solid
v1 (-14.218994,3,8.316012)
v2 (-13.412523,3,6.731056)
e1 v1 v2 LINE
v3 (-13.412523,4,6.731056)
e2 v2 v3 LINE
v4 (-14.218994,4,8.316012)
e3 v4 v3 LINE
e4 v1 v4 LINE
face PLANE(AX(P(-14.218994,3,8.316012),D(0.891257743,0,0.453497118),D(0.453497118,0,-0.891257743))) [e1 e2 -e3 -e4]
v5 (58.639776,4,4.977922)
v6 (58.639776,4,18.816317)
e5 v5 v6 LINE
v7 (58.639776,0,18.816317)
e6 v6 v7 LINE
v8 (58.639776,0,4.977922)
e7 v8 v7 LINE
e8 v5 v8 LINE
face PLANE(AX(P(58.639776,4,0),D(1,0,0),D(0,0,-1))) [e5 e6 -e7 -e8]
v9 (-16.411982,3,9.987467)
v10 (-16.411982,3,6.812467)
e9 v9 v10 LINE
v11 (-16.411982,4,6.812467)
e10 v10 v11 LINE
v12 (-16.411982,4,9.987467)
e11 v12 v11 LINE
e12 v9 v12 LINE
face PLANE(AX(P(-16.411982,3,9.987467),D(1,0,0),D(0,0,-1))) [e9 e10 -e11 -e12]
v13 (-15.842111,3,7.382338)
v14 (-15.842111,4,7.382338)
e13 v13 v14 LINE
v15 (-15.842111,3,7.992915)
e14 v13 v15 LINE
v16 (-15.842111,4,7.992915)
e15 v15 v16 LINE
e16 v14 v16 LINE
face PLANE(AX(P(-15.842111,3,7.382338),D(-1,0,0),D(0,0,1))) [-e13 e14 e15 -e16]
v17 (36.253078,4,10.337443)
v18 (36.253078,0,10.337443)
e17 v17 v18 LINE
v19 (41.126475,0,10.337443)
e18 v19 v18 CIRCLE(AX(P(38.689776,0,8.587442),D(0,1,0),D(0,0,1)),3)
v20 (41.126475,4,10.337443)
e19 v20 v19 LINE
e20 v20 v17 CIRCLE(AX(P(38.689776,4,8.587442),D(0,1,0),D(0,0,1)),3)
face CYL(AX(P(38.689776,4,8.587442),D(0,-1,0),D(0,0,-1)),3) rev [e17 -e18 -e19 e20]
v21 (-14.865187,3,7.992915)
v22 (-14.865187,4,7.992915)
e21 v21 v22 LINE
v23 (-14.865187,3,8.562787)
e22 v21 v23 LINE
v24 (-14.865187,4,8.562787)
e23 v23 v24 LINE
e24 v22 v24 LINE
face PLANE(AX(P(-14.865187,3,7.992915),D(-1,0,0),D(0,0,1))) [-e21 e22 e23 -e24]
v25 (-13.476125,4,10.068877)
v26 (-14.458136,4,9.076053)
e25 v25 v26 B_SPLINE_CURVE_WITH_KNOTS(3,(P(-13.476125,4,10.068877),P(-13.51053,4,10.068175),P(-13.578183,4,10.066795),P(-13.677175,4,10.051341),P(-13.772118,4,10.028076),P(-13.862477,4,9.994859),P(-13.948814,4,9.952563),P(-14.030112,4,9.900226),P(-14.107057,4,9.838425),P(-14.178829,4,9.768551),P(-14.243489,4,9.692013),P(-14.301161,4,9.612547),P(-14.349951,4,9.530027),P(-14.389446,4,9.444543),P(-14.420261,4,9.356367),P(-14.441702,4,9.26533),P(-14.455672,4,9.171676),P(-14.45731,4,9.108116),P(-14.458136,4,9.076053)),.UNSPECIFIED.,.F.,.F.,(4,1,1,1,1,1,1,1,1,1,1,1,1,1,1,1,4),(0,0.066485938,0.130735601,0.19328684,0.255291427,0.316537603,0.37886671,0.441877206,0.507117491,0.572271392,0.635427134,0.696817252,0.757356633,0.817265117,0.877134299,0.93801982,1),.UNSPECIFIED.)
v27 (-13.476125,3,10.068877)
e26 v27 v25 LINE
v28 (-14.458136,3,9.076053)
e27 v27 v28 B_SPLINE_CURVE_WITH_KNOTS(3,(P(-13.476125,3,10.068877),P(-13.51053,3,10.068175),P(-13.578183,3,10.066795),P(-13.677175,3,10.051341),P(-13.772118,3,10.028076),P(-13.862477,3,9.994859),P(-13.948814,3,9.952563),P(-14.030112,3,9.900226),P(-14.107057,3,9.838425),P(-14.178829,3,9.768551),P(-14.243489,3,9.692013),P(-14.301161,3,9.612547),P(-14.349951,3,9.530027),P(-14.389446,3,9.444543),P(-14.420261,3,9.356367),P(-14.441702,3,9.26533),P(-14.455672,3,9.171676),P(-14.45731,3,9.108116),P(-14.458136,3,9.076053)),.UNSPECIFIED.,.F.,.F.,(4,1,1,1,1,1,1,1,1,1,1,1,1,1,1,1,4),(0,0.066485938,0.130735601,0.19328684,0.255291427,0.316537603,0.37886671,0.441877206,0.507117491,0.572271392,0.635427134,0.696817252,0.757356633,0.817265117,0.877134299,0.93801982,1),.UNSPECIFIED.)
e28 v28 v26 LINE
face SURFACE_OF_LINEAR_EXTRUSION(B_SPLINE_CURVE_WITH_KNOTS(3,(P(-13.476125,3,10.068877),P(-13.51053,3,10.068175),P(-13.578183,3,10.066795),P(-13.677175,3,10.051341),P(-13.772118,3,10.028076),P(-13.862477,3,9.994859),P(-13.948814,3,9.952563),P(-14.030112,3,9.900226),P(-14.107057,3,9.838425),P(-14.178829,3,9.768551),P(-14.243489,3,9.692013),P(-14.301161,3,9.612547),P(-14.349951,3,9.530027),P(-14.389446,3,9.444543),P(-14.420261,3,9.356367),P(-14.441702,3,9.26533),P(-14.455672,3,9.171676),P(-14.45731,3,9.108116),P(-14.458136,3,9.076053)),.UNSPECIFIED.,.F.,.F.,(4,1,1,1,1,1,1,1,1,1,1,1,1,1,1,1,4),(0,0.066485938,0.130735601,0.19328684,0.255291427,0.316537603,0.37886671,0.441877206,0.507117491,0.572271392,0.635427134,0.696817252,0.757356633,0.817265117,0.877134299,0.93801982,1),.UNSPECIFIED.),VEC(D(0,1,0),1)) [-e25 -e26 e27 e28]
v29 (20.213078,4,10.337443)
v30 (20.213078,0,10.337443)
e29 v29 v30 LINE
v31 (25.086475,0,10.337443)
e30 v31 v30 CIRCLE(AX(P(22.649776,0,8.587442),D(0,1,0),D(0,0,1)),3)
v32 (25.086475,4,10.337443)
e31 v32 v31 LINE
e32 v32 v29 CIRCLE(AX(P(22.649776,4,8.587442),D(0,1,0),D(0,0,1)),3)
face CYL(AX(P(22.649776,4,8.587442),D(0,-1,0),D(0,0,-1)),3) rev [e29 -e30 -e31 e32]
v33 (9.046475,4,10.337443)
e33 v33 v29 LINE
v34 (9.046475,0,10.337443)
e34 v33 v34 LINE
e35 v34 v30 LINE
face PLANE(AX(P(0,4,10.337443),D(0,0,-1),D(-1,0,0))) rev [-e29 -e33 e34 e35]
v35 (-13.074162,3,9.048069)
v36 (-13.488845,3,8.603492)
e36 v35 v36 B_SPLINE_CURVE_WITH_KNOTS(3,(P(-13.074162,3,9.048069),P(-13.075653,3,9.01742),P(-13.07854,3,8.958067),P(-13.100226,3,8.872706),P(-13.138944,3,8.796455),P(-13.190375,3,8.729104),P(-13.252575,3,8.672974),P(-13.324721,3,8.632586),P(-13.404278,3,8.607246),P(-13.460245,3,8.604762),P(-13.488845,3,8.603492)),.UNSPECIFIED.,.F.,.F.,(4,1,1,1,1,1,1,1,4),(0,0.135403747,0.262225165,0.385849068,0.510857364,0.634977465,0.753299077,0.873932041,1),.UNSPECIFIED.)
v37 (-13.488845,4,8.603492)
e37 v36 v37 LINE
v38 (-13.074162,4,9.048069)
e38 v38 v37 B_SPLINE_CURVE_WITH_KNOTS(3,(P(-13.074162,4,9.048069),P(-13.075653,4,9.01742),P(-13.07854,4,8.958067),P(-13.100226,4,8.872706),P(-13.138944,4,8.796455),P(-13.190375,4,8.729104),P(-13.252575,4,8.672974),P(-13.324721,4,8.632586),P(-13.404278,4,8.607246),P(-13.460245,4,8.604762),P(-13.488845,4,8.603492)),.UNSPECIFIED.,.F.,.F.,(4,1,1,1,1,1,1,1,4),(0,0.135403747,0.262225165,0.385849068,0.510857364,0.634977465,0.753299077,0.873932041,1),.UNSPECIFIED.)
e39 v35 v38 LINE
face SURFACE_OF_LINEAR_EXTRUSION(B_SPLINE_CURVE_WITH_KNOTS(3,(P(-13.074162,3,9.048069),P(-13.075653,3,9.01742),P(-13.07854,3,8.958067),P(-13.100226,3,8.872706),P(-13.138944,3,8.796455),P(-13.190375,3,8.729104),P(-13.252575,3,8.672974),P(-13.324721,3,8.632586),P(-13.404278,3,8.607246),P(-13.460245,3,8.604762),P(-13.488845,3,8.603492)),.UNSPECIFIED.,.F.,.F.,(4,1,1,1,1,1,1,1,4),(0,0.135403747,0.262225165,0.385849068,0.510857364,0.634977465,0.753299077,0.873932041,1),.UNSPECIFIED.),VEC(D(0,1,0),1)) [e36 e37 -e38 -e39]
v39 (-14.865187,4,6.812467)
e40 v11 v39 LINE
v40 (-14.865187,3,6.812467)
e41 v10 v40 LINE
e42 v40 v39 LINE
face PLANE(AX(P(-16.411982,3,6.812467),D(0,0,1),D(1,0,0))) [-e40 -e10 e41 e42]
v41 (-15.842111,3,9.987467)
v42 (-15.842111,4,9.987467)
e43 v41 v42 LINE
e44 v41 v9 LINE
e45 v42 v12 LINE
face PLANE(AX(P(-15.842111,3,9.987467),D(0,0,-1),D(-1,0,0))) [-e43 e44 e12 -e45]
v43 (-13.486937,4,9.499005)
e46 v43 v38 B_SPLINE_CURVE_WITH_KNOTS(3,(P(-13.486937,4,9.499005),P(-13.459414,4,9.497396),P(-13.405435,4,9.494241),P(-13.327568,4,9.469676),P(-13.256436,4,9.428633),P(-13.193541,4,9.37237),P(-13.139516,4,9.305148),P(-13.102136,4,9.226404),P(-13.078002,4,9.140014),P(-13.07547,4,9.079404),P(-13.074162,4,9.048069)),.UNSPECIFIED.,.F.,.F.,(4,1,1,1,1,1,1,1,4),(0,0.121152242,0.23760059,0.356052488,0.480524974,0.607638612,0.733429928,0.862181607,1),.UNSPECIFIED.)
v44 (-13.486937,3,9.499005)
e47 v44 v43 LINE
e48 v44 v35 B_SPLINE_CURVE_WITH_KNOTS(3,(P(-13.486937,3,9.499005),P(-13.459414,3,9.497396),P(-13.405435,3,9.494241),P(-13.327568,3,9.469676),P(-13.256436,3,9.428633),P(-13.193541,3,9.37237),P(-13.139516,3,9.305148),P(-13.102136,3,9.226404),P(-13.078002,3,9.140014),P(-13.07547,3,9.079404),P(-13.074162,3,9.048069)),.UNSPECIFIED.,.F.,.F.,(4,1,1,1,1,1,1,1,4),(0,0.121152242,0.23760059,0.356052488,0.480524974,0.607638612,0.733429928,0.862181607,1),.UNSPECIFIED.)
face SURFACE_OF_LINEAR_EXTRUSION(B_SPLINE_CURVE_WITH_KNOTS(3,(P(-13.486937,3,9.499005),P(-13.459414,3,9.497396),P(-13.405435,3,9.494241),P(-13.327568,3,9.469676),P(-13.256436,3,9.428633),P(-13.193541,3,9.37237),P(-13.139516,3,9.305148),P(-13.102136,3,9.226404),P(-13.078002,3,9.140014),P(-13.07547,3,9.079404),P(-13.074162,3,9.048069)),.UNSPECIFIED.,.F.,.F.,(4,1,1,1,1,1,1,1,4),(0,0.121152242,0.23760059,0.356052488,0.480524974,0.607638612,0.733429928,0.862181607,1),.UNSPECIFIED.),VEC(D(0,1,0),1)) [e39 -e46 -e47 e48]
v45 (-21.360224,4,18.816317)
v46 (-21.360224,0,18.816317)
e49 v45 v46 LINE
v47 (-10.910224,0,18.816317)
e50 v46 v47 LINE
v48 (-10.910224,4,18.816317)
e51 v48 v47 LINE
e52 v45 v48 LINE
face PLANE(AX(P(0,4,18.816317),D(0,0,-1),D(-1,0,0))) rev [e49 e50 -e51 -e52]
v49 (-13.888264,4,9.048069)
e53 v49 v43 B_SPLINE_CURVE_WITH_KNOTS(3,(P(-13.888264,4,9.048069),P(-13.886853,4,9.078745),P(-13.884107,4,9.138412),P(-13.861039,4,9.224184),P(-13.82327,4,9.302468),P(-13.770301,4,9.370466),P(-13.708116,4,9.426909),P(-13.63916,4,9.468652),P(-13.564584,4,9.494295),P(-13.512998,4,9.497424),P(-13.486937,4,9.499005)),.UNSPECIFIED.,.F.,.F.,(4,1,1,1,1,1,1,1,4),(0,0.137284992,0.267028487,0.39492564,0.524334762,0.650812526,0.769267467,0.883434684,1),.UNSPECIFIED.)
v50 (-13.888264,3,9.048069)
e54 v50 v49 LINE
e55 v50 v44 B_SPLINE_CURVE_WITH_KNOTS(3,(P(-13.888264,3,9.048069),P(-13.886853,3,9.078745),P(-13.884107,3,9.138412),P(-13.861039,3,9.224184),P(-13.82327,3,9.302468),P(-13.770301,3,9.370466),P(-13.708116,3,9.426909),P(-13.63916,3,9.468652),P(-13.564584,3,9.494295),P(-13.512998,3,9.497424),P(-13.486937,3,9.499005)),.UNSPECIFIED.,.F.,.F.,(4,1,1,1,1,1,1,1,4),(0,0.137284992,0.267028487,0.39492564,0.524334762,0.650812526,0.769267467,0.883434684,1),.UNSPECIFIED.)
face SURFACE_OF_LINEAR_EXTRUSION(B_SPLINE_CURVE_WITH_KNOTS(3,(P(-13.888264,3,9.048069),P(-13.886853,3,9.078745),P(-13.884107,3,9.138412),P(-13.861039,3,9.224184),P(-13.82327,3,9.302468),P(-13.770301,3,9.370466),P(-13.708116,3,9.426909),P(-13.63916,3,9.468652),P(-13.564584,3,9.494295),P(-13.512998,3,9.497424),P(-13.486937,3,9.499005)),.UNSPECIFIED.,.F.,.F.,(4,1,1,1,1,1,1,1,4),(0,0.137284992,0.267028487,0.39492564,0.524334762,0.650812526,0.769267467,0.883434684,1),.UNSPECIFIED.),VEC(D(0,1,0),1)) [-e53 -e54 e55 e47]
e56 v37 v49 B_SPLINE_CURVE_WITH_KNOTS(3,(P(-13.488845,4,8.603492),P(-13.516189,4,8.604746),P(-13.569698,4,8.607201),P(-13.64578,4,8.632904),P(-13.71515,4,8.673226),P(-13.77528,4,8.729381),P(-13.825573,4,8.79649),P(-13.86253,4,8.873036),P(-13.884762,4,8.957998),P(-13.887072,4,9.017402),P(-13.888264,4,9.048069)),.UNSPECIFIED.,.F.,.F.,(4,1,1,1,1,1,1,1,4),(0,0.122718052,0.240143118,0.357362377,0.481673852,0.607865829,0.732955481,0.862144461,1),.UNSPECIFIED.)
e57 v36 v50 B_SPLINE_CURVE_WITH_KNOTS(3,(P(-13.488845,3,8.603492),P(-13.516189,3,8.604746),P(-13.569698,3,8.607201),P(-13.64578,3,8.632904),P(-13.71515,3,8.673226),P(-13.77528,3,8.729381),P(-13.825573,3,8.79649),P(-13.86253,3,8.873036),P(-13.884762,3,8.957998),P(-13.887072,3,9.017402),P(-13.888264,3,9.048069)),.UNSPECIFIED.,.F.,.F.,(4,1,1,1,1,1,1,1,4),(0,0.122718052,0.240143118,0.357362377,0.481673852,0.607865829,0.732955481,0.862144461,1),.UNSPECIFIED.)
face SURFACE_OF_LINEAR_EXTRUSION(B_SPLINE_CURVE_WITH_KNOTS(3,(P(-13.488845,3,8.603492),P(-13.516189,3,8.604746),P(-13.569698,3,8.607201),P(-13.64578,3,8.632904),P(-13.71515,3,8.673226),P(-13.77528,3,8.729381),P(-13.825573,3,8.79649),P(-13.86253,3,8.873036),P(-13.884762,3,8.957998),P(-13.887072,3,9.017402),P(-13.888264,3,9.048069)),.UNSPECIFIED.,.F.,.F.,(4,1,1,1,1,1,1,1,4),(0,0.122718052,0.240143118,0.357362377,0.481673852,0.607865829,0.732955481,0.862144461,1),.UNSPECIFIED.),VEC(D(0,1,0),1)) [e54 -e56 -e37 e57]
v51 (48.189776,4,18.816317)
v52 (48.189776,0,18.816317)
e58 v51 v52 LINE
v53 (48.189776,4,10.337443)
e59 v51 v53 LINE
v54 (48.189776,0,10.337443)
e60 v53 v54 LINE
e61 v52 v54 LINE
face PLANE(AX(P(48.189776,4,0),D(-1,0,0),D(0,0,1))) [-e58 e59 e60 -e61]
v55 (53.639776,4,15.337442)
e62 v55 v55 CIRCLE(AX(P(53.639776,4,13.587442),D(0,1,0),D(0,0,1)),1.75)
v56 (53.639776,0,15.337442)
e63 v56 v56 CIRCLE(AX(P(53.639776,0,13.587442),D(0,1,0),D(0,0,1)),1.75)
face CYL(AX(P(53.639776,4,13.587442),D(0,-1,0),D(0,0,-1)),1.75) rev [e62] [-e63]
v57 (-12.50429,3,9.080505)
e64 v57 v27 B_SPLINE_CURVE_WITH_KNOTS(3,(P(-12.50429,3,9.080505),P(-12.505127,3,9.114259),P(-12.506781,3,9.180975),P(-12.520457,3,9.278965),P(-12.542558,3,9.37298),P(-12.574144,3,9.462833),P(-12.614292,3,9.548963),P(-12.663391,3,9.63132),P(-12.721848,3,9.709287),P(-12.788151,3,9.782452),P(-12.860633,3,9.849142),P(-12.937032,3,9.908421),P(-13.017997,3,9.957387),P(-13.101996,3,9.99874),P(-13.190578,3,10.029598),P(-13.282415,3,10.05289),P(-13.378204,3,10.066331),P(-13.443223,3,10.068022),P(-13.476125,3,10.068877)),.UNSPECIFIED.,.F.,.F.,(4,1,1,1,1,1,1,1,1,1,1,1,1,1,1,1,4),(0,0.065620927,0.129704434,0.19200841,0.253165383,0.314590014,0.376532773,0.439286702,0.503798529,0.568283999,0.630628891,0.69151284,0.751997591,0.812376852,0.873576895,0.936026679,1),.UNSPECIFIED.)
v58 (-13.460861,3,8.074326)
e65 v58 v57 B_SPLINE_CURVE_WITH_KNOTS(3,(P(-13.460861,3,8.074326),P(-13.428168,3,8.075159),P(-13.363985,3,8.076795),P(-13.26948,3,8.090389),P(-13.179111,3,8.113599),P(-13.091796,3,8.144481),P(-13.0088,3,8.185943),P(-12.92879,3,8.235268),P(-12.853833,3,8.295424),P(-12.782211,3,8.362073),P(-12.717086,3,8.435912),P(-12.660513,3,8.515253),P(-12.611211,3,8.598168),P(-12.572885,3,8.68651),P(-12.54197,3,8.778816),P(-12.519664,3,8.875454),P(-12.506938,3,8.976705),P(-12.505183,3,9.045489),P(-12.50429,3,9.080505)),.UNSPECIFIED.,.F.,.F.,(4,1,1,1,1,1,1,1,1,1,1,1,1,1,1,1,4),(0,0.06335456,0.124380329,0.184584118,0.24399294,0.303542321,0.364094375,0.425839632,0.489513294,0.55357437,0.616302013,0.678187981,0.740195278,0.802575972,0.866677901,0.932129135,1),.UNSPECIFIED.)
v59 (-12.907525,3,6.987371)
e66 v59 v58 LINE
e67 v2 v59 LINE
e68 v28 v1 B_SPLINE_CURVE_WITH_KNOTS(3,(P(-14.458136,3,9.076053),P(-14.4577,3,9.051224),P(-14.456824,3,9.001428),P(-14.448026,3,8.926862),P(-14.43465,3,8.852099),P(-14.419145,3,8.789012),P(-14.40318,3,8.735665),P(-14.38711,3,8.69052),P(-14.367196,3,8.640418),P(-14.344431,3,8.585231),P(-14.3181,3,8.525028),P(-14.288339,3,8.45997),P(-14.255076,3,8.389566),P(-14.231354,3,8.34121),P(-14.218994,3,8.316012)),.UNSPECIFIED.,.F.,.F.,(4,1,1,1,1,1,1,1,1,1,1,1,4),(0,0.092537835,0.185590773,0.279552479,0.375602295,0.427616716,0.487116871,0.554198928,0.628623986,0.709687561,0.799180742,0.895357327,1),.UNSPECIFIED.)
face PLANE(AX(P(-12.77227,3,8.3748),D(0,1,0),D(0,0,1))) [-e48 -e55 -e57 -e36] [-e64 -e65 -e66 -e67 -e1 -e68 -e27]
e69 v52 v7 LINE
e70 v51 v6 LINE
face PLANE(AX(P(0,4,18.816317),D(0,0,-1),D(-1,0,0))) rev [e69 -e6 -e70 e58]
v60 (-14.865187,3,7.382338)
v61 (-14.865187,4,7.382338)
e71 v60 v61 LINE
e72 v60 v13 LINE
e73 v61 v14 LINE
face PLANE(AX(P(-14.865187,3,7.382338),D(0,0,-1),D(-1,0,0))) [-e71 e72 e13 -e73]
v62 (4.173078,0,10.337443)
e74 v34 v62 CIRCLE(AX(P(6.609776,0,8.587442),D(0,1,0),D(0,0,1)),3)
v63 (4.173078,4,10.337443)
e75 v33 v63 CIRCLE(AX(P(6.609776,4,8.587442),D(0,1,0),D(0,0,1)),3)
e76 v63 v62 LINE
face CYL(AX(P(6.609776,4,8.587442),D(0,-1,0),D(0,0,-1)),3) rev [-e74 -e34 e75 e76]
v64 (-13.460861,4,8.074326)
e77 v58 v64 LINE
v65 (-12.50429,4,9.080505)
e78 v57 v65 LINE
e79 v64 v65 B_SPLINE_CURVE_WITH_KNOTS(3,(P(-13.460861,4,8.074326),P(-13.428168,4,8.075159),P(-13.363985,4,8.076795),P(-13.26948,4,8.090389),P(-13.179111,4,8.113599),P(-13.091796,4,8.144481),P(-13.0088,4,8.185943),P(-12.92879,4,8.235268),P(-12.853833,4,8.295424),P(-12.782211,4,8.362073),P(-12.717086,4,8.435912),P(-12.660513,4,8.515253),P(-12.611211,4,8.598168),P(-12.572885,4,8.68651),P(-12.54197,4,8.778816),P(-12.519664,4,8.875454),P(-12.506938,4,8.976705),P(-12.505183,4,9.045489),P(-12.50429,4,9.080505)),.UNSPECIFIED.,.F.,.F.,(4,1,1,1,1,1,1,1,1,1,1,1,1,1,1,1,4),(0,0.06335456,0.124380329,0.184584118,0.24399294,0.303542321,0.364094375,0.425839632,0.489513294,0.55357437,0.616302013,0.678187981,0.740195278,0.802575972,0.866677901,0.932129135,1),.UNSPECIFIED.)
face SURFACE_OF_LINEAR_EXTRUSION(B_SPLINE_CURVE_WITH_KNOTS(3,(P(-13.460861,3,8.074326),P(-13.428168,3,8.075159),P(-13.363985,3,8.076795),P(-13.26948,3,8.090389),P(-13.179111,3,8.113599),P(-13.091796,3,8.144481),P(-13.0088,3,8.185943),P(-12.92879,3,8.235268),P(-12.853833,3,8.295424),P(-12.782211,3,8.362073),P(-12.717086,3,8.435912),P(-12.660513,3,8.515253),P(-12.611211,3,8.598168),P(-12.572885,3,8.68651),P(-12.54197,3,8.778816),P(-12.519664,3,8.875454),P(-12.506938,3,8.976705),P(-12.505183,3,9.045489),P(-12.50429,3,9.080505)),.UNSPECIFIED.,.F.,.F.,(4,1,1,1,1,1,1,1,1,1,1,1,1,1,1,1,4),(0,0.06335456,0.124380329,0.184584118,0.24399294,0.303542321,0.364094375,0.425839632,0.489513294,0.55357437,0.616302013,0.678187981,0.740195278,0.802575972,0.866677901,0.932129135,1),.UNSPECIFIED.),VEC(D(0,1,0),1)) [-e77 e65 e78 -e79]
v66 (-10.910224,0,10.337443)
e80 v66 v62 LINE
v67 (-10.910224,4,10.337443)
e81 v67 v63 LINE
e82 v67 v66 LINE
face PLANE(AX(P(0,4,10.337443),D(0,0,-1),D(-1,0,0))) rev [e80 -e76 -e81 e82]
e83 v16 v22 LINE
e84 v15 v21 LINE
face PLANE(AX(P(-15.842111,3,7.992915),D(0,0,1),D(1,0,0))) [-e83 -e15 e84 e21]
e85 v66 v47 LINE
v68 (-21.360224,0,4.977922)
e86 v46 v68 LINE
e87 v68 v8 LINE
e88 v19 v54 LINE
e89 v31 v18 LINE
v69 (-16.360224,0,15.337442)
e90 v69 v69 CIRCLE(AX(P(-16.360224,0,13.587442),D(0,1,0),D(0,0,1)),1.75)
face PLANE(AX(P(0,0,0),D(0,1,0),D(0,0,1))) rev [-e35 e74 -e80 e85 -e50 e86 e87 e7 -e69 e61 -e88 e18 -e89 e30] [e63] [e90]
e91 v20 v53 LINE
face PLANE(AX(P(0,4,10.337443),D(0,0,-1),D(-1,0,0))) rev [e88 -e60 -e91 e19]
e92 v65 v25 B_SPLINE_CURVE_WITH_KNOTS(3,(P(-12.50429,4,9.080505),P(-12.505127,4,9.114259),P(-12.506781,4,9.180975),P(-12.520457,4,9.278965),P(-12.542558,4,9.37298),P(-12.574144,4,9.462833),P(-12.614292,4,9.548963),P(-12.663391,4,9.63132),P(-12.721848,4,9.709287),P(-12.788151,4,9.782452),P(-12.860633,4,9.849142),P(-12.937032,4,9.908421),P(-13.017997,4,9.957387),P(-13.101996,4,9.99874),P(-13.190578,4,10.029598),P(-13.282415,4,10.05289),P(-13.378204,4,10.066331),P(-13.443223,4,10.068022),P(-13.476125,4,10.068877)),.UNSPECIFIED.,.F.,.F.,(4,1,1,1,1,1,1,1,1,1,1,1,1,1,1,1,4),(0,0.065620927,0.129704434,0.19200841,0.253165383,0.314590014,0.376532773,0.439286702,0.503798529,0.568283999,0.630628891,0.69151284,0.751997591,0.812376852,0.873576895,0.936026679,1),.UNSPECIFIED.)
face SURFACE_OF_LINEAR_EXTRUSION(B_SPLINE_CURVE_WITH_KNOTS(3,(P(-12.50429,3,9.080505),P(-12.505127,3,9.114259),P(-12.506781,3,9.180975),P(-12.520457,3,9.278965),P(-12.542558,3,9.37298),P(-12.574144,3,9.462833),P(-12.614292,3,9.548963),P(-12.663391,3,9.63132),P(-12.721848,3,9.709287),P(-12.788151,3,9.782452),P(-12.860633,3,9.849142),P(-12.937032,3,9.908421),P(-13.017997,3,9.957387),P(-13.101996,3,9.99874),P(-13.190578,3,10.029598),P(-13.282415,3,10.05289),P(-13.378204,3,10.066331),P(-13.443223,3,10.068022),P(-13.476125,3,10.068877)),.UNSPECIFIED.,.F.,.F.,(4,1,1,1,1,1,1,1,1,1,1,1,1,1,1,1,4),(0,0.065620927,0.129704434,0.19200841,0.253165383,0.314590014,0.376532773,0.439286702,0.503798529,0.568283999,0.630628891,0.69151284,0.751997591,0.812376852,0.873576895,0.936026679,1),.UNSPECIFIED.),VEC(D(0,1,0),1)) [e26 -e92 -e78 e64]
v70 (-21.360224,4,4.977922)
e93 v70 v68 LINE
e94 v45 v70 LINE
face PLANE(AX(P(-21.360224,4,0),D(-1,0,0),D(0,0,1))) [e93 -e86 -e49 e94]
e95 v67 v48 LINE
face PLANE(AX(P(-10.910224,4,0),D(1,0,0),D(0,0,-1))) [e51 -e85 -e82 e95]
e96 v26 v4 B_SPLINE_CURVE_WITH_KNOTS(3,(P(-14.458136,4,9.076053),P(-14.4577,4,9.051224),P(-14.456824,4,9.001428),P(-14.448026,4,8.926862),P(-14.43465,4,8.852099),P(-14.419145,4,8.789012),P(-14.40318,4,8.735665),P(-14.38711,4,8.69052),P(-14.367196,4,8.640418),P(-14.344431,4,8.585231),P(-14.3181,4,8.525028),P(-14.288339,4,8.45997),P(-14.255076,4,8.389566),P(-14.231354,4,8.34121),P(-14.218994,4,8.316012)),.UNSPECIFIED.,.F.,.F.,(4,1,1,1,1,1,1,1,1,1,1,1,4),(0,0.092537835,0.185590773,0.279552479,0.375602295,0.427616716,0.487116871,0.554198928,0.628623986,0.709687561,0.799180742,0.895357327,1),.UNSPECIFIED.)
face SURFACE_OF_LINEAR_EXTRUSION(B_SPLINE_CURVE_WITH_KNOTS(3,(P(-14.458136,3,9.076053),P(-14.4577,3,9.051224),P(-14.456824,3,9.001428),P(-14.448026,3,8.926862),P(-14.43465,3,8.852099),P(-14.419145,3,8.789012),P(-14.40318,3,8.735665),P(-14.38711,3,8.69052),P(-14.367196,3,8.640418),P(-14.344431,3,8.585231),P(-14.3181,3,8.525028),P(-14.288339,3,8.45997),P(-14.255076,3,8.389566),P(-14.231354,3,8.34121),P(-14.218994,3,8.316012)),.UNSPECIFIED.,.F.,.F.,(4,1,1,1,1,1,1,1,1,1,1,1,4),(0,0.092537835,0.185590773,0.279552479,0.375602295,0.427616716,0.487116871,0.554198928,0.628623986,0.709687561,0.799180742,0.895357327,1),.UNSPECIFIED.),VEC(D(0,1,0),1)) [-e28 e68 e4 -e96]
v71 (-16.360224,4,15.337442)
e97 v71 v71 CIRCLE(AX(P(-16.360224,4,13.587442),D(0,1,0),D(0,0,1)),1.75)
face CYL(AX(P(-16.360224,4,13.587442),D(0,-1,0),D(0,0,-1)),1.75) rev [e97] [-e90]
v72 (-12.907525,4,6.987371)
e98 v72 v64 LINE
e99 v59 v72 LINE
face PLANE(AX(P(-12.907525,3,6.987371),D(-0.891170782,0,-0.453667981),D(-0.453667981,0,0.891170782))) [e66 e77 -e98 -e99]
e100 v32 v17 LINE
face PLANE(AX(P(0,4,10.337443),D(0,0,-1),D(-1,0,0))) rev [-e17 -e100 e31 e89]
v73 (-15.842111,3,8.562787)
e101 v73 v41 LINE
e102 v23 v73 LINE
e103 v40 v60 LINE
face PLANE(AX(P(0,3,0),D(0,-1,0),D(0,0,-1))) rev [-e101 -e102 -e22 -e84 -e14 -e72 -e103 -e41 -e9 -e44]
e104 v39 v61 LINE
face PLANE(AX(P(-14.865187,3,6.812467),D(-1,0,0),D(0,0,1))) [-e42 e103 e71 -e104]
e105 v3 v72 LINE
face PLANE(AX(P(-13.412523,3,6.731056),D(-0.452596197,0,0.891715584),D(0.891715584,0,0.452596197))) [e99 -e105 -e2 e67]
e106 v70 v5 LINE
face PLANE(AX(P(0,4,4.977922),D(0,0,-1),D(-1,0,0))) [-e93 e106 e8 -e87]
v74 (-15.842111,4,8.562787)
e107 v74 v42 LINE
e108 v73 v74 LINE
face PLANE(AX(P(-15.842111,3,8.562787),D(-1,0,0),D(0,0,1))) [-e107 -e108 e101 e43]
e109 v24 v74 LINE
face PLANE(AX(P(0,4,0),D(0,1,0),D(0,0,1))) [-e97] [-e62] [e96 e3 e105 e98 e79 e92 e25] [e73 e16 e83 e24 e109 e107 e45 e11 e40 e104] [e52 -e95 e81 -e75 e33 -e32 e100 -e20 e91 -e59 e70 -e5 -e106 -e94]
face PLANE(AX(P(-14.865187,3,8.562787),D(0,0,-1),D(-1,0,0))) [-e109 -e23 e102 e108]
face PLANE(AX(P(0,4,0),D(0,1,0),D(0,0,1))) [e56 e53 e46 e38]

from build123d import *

# Parameters (mm, degrees)
BOSS_EXTRUDE1_OUTLINE_R = 1.75
BOSS_EXTRUDE1_DEPTH     = 4
CUT_EXTRUDE1_DEPTH      = 1


# Read off the part's stored shape, not the designer's step: Boss-Extrude1
with BuildPart() as part:
    # Boss-Extrude1 outline → Boss-Extrude1 (new body)
    with BuildSketch(Plane(origin=(0, 0, 0), x_dir=(1, 0, 0), z_dir=(0, 1, 0))):
        with BuildLine():
            Line((25.086474615, -10.33744254), (36.25307775, -10.33744254))
            ThreePointArc((36.25307775, -10.33744254), (38.689776183, -5.587442326), (41.126474615, -10.33744254))
            Line((41.126474615, -10.33744254), (48.189776182, -10.33744254))
            Line((48.189776182, -10.33744254), (48.189776182, -18.81631662))
            Line((48.189776182, -18.81631662), (58.639776182, -18.81631662))
            Line((58.639776182, -18.81631662), (58.639776182, -4.977921711))
            Line((58.639776182, -4.977921711), (-21.360223818, -4.977921711))
            Line((-21.360223818, -4.977921711), (-21.360223818, -18.81631662))
            Line((-21.360223818, -18.81631662), (-10.910223818, -18.81631662))
            Line((-10.910223818, -18.81631662), (-10.910223818, -10.33744254))
            Line((-10.910223818, -10.33744254), (4.17307775, -10.33744254))
            ThreePointArc((4.17307775, -10.33744254), (6.609776182, -5.587442326), (9.046474615, -10.33744254))
            Line((9.046474615, -10.33744254), (20.21307775, -10.33744254))
            ThreePointArc((20.21307775, -10.33744254), (22.649776182, -5.587442326), (25.086474615, -10.33744254))
        make_face()
        with Locations((-16.360223818, -13.587442433)):
            Circle(BOSS_EXTRUDE1_OUTLINE_R, mode=Mode.SUBTRACT)
        with Locations((53.639776182, -13.587442433)):
            Circle(BOSS_EXTRUDE1_OUTLINE_R, mode=Mode.SUBTRACT)
    extrude(amount=BOSS_EXTRUDE1_DEPTH)

    # Sketch2 → Cut-Extrude1 (cut)
    # profile 1 of 2: a face of its own
    with BuildSketch(Plane(origin=(0, 4, 0), x_dir=(1, 0, 0), z_dir=(0, 1, 0))):
        Polygon((-16.41198232, -6.812466594), (-14.865187448, -6.812466594), (-14.865187448, -7.382338389), (-15.842110525, -7.382338389), (-15.842110525, -7.992915312), (-14.865187448, -7.992915312), (-14.865187448, -8.562787107), (-15.842110525, -8.562787107), (-15.842110525, -9.987466594), (-16.41198232, -9.987466594), align=None)
    # profile 2 of 2: a face of its own
    with BuildSketch(Plane(origin=(0, 4, 0), x_dir=(1, 0, 0), z_dir=(0, 1, 0))):
        with BuildLine():
            Line((-13.412523186, -6.731056337), (-12.907525189, -6.987371442))
            Line((-12.907525189, -6.987371442), (-13.460860525, -8.074325568))
            add(Edge.make_bspline(
                [(-13.460860525, -8.074325568), (-13.428168252, -8.075158914), (-13.363985411, -8.076794974), (-13.269480346, -8.090388716), (-13.179110672, -8.113598896), (-13.09179585, -8.144481034), (-13.008800475, -8.185943305), (-12.928789535, -8.235267944), (-12.853832504, -8.295423778), (-12.782210807, -8.362073474), (-12.717085558, -8.435911696), (-12.660512768, -8.515253227), (-12.611210579, -8.59816766), (-12.572885042, -8.686509995), (-12.541970388, -8.778815858), (-12.519664104, -8.875454234), (-12.506937745, -8.976704968), (-12.505183204, -9.045489177), (-12.504290013, -9.080505456)],
                knots=[0, 0, 0, 0, 1.013672955, 1.990085268, 2.953345895, 3.903887042, 4.856677135, 5.825509993, 6.813434118, 7.832212698, 8.85718992, 9.860832204, 10.8510077, 11.84312444, 12.841215551, 13.86684641, 14.914066156, 16, 16, 16, 16], degree=3))
            add(Edge.make_bspline(
                [(-12.504290013, -9.080505456), (-12.505127007, -9.114259025), (-12.506781387, -9.180975356), (-12.520457023, -9.278964679), (-12.54255757, -9.372979704), (-12.57414369, -9.462832672), (-12.614292202, -9.548962785), (-12.663391114, -9.631319503), (-12.721847604, -9.7092874), (-12.78815132, -9.782452193), (-12.860632718, -9.849142442), (-12.937032061, -9.908420617), (-13.017996745, -9.957386638), (-13.101996444, -9.998739592), (-13.190577642, -10.029597853), (-13.28241472, -10.052890494), (-13.378204103, -10.06633136), (-13.443223482, -10.068021564), (-13.476124948, -10.06887685)],
                knots=[0, 0, 0, 0, 1.049934834, 2.075270938, 3.072134561, 4.05064612, 5.033440221, 6.024524368, 7.028587226, 8.060776465, 9.092543989, 10.090062252, 11.064205434, 12.031961459, 12.998029633, 13.977230324, 14.976426867, 16, 16, 16, 16], degree=3))
            add(Edge.make_bspline(
                [(-13.476124948, -10.06887685), (-13.510529884, -10.068174962), (-13.578182536, -10.066794794), (-13.677175296, -10.051340548), (-13.772117873, -10.028076335), (-13.862476674, -9.994858992), (-13.948813614, -9.952563006), (-14.03011223, -9.900225978), (-14.107057351, -9.838425045), (-14.17882863, -9.768550629), (-14.243489203, -9.692012768), (-14.30116103, -9.61254654), (-14.349951471, -9.530027246), (-14.389446195, -9.444543116), (-14.420260894, -9.356366547), (-14.44170164, -9.265330188), (-14.455672265, -9.171675513), (-14.457310002, -9.108116151), (-14.458136166, -9.076053333)],
                knots=[0, 0, 0, 0, 1.063775006, 2.091769615, 3.092589432, 4.084662827, 5.064601646, 6.061867366, 7.070035304, 8.113879863, 9.156342271, 10.166834137, 11.149076039, 12.117706134, 13.076241869, 14.034148791, 15.008317125, 16, 16, 16, 16], degree=3))
            add(Edge.make_bspline(
                [(-14.458136166, -9.076053333), (-14.457699638, -9.05122443), (-14.45682415, -9.001428418), (-14.448026022, -8.926861595), (-14.434649776, -8.852099041), (-14.419144957, -8.789012031), (-14.40317966, -8.735665362), (-14.387110466, -8.690519517), (-14.367196241, -8.640417501), (-14.344431332, -8.585231374), (-14.318099865, -8.525027523), (-14.288339392, -8.45997005), (-14.255075822, -8.38956629), (-14.231354315, -8.341209808), (-14.218993538, -8.316012267)],
                knots=[0, 0, 0, 0, 1.110454016, 2.227089276, 3.35462975, 4.507227546, 5.131400587, 5.845402449, 6.650387134, 7.543487832, 8.516250726, 9.590168902, 10.744287919, 12, 12, 12, 12], degree=3))
            Line((-14.218993538, -8.316012267), (-13.412523186, -6.731056337))
        make_face()
        with BuildLine():
            add(Edge.make_bspline(
                [(-13.488845301, -8.603492235), (-13.516189484, -8.604746455), (-13.569698461, -8.607200799), (-13.645780224, -8.632903881), (-13.71514953, -8.67322562), (-13.775279703, -8.729381439), (-13.825573059, -8.796489848), (-13.862530382, -8.873035953), (-13.884762266, -8.957998267), (-13.887072017, -9.0174025), (-13.888264372, -9.048068557)],
                knots=[0, 0, 0, 0, 0.981744412, 1.921144944, 2.858899012, 3.85339082, 4.86292663, 5.863643845, 6.897155691, 8, 8, 8, 8], degree=3))
            add(Edge.make_bspline(
                [(-13.888264372, -9.048068557), (-13.886852586, -9.078744826), (-13.884106568, -9.138412221), (-13.861038737, -9.224183527), (-13.823269539, -9.302467905), (-13.770300647, -9.370465646), (-13.708115929, -9.426909036), (-13.639160453, -9.468651622), (-13.56458442, -9.494295462), (-13.512998357, -9.497424351), (-13.486937248, -9.499005055)],
                knots=[0, 0, 0, 0, 1.098279937, 2.136227893, 3.159405121, 4.194678092, 5.206500211, 6.154139736, 7.067477469, 8, 8, 8, 8], degree=3))
            add(Edge.make_bspline(
                [(-13.486937248, -9.499005055), (-13.459413771, -9.497396198), (-13.405435452, -9.494240948), (-13.327568188, -9.469676154), (-13.256435974, -9.428632893), (-13.193541338, -9.372370211), (-13.13951604, -9.305148416), (-13.102135992, -9.226404206), (-13.078001724, -9.140013833), (-13.075470478, -9.079404145), (-13.074161807, -9.048068557)],
                knots=[0, 0, 0, 0, 0.96921794, 1.900804717, 2.848419905, 3.844199796, 4.861108892, 5.867439427, 6.897452859, 8, 8, 8, 8], degree=3))
            add(Edge.make_bspline(
                [(-13.074161807, -9.048068557), (-13.075652622, -9.017420405), (-13.078539758, -8.95806668), (-13.100225571, -8.872706338), (-13.138944126, -8.79645527), (-13.19037541, -8.729104426), (-13.252574944, -8.672973647), (-13.324720551, -8.632585891), (-13.404277856, -8.607246336), (-13.460245153, -8.604761847), (-13.488845301, -8.603492235)],
                knots=[0, 0, 0, 0, 1.083229974, 2.097801324, 3.086792542, 4.086858909, 5.079819718, 6.026392613, 6.991456328, 8, 8, 8, 8], degree=3))
        make_face(mode=Mode.SUBTRACT)
    extrude(amount=-CUT_EXTRUDE1_DEPTH, mode=Mode.SUBTRACT)


solid = part.part
